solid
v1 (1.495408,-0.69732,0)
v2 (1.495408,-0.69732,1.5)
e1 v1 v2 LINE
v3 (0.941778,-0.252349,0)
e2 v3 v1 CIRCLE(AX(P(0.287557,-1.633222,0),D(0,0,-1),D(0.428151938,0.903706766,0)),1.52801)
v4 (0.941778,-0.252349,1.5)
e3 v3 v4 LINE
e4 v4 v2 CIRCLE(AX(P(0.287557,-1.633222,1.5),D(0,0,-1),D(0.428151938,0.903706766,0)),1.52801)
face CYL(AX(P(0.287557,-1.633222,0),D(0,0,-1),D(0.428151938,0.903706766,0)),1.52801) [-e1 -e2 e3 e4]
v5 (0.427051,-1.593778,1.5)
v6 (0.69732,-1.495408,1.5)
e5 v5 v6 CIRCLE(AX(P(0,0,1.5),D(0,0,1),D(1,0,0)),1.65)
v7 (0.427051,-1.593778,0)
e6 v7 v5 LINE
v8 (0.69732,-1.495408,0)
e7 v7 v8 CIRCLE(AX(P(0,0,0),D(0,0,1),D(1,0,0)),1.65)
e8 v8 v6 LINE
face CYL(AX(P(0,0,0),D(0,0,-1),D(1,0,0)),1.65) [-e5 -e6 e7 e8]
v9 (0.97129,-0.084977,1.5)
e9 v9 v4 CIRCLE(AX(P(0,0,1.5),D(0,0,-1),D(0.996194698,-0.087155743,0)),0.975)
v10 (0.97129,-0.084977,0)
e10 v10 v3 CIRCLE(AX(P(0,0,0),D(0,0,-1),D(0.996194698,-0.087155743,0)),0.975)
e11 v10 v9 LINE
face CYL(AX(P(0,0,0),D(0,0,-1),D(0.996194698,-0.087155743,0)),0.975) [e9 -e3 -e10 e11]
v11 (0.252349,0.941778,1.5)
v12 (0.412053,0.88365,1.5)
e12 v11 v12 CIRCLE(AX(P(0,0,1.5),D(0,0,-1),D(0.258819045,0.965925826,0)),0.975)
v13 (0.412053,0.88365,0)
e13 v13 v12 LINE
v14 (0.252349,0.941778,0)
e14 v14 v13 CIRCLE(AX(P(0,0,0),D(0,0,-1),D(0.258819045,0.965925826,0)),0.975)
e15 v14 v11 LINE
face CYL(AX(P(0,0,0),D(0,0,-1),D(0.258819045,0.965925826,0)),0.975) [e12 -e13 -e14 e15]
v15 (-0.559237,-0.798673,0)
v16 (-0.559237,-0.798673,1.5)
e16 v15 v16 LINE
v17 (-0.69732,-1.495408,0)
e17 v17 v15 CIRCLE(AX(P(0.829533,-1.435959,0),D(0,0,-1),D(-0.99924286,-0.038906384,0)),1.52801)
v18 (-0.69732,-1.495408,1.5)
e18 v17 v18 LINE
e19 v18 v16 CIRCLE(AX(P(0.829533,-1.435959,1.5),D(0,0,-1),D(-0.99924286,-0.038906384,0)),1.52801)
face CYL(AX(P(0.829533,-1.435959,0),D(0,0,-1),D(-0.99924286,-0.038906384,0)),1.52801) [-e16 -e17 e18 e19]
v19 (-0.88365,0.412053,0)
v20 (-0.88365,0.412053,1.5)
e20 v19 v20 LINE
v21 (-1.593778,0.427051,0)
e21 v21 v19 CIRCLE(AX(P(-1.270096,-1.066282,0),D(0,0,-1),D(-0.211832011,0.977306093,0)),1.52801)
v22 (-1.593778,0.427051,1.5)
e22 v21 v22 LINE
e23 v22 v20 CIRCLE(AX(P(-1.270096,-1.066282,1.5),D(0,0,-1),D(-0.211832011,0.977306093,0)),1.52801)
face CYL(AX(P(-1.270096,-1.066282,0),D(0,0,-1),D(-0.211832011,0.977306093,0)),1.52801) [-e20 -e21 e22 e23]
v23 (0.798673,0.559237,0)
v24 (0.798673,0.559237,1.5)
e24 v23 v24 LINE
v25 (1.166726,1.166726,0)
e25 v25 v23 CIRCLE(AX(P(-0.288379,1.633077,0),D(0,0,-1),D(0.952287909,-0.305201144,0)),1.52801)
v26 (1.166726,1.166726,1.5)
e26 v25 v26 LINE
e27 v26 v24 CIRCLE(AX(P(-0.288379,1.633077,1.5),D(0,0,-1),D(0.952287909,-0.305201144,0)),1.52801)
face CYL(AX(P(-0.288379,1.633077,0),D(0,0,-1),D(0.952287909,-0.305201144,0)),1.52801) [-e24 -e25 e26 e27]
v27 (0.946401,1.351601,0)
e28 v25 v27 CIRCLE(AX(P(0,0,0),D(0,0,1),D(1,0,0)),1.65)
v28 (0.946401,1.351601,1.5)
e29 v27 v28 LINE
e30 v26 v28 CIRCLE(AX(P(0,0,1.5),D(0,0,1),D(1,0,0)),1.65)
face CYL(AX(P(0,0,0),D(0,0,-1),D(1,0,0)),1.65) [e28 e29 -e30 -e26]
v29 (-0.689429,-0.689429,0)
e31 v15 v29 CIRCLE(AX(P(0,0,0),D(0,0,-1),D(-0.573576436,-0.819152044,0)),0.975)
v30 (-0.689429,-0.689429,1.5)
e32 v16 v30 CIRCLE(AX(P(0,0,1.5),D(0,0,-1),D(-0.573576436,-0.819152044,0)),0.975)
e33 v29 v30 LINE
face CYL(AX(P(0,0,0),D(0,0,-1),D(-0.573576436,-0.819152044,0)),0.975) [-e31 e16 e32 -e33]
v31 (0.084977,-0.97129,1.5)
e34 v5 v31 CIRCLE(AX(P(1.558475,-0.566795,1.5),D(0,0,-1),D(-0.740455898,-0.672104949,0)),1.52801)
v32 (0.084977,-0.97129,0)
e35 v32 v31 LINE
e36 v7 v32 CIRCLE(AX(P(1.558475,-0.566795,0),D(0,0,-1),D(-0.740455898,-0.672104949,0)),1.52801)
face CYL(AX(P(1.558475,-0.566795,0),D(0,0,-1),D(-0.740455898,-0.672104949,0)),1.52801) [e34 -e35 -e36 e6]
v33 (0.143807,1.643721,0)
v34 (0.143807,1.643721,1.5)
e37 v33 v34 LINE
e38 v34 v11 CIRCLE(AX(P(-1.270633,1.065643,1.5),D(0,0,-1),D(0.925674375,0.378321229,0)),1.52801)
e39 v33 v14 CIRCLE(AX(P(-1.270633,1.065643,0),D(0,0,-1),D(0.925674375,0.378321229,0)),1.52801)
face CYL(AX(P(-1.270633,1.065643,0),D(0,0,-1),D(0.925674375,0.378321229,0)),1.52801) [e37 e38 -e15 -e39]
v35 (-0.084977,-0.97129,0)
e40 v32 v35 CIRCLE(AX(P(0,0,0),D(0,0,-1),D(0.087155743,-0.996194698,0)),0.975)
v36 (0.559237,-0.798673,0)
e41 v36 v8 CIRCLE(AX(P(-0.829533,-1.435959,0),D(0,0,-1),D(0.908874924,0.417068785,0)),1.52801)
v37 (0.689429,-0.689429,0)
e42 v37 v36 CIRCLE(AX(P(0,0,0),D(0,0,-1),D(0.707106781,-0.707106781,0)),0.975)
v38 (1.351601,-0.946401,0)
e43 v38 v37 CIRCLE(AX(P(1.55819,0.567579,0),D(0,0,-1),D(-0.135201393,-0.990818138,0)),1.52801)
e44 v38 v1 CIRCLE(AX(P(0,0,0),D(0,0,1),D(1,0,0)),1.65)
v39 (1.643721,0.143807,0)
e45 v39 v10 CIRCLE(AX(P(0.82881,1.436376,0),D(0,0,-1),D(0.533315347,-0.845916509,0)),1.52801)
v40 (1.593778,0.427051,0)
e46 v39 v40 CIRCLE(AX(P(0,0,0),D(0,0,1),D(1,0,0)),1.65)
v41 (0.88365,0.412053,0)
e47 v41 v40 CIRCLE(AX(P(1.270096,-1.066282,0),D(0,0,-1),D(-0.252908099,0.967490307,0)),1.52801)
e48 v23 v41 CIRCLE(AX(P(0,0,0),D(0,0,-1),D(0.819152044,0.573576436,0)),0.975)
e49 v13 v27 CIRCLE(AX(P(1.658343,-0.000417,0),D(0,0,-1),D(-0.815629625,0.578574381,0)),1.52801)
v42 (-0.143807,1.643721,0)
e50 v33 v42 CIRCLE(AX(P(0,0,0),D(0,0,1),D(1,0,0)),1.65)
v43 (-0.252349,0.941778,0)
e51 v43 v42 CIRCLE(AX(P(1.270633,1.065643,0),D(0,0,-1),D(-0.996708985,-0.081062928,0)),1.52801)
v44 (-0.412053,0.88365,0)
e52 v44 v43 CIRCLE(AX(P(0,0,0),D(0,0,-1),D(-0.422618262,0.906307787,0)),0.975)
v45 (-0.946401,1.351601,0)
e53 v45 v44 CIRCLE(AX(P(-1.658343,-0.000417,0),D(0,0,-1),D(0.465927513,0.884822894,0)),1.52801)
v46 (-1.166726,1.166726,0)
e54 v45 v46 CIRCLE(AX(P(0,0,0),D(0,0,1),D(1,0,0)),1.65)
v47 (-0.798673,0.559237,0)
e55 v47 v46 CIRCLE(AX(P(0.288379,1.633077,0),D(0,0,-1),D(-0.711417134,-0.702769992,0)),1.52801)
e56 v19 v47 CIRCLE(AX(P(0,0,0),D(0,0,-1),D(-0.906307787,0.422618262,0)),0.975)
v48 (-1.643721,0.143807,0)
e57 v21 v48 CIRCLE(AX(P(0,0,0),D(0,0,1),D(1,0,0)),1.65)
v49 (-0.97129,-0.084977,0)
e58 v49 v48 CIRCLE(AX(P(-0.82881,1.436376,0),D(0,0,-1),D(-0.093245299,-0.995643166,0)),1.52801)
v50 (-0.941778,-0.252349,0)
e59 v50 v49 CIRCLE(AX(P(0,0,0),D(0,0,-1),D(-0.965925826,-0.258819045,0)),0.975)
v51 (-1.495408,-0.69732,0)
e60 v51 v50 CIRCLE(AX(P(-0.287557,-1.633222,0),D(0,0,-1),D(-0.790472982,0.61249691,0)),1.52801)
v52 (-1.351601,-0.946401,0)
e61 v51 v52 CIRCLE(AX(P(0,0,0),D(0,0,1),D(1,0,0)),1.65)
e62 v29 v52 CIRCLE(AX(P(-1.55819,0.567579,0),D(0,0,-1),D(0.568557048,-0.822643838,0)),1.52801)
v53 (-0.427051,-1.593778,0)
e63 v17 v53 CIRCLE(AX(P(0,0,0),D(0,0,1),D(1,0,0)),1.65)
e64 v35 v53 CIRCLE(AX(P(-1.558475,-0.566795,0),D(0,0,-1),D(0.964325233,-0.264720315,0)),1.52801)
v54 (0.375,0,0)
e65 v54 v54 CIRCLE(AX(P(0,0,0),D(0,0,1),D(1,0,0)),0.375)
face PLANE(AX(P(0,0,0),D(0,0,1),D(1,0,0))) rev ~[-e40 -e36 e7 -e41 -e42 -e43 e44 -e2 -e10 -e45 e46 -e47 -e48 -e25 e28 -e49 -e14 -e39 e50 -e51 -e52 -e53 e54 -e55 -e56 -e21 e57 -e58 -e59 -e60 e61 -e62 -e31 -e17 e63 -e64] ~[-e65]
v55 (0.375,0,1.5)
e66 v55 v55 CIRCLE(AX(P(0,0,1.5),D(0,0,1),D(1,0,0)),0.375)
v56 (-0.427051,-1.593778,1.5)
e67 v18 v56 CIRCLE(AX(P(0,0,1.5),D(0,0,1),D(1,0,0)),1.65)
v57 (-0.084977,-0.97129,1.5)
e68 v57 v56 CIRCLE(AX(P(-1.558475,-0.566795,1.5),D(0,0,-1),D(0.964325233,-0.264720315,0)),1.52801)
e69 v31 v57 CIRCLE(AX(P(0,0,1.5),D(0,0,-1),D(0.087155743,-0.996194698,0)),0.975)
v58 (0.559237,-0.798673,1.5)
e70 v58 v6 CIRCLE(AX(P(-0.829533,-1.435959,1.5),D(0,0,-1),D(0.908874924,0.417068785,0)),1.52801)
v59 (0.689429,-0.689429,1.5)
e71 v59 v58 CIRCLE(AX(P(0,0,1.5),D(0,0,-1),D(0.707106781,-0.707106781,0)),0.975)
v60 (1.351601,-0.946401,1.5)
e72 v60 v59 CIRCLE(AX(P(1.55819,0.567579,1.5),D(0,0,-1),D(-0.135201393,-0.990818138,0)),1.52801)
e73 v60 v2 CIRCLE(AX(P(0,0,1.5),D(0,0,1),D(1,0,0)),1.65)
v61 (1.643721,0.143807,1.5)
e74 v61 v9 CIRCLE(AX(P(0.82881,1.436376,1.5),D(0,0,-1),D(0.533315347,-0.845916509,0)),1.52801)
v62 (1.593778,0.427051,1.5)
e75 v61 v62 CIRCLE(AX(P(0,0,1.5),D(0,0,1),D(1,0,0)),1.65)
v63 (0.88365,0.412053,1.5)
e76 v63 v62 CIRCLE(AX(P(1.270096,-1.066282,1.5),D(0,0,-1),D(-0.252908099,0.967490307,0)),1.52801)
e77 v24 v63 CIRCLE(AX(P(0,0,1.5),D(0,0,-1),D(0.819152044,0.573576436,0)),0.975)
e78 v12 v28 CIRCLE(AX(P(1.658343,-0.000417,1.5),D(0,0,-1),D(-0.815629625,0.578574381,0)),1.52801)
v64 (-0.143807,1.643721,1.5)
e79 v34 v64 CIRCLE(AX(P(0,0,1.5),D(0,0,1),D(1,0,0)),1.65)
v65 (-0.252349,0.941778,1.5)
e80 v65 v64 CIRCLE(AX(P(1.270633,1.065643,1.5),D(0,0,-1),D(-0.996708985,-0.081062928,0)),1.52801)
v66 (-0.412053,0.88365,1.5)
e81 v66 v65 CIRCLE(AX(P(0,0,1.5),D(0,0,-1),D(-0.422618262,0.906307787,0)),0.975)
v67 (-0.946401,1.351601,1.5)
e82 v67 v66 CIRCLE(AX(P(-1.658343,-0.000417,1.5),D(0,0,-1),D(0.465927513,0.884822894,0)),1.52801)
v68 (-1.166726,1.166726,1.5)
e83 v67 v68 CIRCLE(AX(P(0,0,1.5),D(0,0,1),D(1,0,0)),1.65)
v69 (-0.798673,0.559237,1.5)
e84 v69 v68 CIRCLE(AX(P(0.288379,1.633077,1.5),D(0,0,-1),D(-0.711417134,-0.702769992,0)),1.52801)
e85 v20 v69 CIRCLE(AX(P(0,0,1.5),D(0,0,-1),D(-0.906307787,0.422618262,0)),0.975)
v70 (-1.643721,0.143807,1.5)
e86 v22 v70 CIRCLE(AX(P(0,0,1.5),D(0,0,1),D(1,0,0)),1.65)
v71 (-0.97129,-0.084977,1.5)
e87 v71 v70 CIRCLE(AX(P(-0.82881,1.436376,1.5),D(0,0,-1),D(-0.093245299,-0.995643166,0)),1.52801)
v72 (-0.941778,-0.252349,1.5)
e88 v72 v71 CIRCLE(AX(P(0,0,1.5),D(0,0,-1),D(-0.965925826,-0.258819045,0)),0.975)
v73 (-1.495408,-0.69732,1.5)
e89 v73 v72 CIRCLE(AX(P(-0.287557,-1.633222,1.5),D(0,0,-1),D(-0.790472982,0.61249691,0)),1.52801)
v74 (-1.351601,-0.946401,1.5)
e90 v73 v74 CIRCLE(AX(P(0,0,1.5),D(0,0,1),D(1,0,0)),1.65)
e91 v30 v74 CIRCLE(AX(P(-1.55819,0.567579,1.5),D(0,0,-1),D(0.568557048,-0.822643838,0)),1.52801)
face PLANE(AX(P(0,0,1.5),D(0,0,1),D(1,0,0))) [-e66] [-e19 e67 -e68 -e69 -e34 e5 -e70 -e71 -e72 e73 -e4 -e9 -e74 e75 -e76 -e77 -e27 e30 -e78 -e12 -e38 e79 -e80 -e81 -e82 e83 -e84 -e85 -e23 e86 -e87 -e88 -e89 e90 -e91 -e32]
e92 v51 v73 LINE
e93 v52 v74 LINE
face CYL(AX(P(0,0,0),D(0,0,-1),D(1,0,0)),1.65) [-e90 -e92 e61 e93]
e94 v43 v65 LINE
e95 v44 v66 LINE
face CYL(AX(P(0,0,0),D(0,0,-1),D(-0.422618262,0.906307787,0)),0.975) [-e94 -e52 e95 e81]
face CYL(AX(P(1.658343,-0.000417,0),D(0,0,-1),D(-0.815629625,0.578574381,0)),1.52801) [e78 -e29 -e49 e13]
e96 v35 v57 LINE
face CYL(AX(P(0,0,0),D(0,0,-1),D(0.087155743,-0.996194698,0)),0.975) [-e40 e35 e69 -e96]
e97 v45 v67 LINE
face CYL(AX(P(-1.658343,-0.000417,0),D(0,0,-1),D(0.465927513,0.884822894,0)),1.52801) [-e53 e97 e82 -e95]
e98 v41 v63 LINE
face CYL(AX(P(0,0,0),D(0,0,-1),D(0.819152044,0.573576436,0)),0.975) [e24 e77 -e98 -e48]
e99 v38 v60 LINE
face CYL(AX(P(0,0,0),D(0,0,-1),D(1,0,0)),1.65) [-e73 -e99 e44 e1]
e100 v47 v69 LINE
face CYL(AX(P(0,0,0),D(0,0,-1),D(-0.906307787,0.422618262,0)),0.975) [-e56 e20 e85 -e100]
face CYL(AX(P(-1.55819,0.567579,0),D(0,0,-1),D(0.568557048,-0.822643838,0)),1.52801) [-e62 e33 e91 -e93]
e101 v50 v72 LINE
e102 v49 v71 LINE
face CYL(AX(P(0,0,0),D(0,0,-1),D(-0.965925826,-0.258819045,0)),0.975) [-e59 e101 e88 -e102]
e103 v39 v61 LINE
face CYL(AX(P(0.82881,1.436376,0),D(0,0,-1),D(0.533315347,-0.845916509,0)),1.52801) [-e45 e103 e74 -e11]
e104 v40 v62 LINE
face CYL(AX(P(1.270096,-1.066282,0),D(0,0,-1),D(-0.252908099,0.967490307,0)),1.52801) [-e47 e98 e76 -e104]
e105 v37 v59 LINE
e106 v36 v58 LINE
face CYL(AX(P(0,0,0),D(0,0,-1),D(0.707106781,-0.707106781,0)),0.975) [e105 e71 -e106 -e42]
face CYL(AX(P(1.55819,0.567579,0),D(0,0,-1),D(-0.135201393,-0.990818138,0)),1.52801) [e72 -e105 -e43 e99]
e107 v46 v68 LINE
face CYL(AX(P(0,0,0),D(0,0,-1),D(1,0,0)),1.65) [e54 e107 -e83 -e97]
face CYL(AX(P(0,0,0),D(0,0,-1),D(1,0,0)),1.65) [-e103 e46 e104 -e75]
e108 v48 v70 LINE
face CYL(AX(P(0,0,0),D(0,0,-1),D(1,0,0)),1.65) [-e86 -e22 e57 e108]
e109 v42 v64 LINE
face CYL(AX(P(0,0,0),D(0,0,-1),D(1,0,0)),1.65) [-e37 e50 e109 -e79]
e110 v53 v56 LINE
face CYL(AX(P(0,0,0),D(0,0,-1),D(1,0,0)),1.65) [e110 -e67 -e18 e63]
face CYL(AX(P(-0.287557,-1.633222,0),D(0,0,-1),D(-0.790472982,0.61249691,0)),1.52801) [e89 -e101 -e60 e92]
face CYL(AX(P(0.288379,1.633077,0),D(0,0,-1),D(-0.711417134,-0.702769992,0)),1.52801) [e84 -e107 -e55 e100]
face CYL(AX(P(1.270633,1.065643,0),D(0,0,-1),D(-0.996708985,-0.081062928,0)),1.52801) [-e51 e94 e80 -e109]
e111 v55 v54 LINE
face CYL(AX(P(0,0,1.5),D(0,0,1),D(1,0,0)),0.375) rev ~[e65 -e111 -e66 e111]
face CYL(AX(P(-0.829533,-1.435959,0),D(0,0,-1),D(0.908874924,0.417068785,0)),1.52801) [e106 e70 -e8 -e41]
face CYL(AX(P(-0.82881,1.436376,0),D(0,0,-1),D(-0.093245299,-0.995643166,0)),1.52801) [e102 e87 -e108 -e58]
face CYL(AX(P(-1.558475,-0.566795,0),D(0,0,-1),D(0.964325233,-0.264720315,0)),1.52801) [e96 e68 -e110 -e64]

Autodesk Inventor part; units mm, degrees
sketch "Sketch1" plane through (0, 0, 0) normal (0, 0, 1) x (1, 0, 0)
  circle A0 centre (0, 0) radius 1.65
  dimension "d0" = 3.3
extrude "Extrusion1" add sketch "Sketch1" along normal blind 1.5
ref_plane "Work Plane2" through (0, 0, 0.75) normal (0, 0, 1) x (1, 0, 0)
sketch "Sketch2" plane through (0, 0, 0) normal (0, 0, -1) x (-1, 0, 0)
  circle A0 centre (0, 0) radius 1.65 projected
  circle A1 centre (0, 0) radius 1.35
  dimension "d3" = 2.7
surface extrude "ピッチ円直径" sketch "Sketch2" against normal through all shown no curves A1
ref_plane "Work Plane8" through (0, 0, 0) normal (0.9396926, 0.3420201, 0) x (0, 0, 1)
ref_plane "Work Plane9" through (0, 0, 0) normal (1, 0, 0) x (0, 1, 0)
spur gear teeth "平歯車" teeth 9 pitch diameter 2.7 tip diameter 3.3 root diameter 1.95 face width 1.5 start plane through (0, 0, 0) normal (0, 0, -1) x (-1, 0, 0)
sketch "スケッチ3" plane through (0, 0, 1.5) normal (0, 0, 1) x (1, 0, 0)
  circle A0 centre (0, 0) radius 0.375
  dimension "d49" = 0.75
extrude "押し出し2" cut sketch "スケッチ3" against normal through all
equation "\"d0\" = da_da"
equation "\"d1\" = da_b"
equation "\"d3\" = da_d"
equation "\"d16\" = da_aw"
equation "\"d43\" = da_aw"
equation "\"d46\" = da_aw"
equation "\"da_da\" = 3.3"
equation "\"da_b\" = 1.5"
equation "\"da_d\" = 2.7"
equation "\"da_aw\" = 7.05"
properties part number "平歯車2" material "Steel"
